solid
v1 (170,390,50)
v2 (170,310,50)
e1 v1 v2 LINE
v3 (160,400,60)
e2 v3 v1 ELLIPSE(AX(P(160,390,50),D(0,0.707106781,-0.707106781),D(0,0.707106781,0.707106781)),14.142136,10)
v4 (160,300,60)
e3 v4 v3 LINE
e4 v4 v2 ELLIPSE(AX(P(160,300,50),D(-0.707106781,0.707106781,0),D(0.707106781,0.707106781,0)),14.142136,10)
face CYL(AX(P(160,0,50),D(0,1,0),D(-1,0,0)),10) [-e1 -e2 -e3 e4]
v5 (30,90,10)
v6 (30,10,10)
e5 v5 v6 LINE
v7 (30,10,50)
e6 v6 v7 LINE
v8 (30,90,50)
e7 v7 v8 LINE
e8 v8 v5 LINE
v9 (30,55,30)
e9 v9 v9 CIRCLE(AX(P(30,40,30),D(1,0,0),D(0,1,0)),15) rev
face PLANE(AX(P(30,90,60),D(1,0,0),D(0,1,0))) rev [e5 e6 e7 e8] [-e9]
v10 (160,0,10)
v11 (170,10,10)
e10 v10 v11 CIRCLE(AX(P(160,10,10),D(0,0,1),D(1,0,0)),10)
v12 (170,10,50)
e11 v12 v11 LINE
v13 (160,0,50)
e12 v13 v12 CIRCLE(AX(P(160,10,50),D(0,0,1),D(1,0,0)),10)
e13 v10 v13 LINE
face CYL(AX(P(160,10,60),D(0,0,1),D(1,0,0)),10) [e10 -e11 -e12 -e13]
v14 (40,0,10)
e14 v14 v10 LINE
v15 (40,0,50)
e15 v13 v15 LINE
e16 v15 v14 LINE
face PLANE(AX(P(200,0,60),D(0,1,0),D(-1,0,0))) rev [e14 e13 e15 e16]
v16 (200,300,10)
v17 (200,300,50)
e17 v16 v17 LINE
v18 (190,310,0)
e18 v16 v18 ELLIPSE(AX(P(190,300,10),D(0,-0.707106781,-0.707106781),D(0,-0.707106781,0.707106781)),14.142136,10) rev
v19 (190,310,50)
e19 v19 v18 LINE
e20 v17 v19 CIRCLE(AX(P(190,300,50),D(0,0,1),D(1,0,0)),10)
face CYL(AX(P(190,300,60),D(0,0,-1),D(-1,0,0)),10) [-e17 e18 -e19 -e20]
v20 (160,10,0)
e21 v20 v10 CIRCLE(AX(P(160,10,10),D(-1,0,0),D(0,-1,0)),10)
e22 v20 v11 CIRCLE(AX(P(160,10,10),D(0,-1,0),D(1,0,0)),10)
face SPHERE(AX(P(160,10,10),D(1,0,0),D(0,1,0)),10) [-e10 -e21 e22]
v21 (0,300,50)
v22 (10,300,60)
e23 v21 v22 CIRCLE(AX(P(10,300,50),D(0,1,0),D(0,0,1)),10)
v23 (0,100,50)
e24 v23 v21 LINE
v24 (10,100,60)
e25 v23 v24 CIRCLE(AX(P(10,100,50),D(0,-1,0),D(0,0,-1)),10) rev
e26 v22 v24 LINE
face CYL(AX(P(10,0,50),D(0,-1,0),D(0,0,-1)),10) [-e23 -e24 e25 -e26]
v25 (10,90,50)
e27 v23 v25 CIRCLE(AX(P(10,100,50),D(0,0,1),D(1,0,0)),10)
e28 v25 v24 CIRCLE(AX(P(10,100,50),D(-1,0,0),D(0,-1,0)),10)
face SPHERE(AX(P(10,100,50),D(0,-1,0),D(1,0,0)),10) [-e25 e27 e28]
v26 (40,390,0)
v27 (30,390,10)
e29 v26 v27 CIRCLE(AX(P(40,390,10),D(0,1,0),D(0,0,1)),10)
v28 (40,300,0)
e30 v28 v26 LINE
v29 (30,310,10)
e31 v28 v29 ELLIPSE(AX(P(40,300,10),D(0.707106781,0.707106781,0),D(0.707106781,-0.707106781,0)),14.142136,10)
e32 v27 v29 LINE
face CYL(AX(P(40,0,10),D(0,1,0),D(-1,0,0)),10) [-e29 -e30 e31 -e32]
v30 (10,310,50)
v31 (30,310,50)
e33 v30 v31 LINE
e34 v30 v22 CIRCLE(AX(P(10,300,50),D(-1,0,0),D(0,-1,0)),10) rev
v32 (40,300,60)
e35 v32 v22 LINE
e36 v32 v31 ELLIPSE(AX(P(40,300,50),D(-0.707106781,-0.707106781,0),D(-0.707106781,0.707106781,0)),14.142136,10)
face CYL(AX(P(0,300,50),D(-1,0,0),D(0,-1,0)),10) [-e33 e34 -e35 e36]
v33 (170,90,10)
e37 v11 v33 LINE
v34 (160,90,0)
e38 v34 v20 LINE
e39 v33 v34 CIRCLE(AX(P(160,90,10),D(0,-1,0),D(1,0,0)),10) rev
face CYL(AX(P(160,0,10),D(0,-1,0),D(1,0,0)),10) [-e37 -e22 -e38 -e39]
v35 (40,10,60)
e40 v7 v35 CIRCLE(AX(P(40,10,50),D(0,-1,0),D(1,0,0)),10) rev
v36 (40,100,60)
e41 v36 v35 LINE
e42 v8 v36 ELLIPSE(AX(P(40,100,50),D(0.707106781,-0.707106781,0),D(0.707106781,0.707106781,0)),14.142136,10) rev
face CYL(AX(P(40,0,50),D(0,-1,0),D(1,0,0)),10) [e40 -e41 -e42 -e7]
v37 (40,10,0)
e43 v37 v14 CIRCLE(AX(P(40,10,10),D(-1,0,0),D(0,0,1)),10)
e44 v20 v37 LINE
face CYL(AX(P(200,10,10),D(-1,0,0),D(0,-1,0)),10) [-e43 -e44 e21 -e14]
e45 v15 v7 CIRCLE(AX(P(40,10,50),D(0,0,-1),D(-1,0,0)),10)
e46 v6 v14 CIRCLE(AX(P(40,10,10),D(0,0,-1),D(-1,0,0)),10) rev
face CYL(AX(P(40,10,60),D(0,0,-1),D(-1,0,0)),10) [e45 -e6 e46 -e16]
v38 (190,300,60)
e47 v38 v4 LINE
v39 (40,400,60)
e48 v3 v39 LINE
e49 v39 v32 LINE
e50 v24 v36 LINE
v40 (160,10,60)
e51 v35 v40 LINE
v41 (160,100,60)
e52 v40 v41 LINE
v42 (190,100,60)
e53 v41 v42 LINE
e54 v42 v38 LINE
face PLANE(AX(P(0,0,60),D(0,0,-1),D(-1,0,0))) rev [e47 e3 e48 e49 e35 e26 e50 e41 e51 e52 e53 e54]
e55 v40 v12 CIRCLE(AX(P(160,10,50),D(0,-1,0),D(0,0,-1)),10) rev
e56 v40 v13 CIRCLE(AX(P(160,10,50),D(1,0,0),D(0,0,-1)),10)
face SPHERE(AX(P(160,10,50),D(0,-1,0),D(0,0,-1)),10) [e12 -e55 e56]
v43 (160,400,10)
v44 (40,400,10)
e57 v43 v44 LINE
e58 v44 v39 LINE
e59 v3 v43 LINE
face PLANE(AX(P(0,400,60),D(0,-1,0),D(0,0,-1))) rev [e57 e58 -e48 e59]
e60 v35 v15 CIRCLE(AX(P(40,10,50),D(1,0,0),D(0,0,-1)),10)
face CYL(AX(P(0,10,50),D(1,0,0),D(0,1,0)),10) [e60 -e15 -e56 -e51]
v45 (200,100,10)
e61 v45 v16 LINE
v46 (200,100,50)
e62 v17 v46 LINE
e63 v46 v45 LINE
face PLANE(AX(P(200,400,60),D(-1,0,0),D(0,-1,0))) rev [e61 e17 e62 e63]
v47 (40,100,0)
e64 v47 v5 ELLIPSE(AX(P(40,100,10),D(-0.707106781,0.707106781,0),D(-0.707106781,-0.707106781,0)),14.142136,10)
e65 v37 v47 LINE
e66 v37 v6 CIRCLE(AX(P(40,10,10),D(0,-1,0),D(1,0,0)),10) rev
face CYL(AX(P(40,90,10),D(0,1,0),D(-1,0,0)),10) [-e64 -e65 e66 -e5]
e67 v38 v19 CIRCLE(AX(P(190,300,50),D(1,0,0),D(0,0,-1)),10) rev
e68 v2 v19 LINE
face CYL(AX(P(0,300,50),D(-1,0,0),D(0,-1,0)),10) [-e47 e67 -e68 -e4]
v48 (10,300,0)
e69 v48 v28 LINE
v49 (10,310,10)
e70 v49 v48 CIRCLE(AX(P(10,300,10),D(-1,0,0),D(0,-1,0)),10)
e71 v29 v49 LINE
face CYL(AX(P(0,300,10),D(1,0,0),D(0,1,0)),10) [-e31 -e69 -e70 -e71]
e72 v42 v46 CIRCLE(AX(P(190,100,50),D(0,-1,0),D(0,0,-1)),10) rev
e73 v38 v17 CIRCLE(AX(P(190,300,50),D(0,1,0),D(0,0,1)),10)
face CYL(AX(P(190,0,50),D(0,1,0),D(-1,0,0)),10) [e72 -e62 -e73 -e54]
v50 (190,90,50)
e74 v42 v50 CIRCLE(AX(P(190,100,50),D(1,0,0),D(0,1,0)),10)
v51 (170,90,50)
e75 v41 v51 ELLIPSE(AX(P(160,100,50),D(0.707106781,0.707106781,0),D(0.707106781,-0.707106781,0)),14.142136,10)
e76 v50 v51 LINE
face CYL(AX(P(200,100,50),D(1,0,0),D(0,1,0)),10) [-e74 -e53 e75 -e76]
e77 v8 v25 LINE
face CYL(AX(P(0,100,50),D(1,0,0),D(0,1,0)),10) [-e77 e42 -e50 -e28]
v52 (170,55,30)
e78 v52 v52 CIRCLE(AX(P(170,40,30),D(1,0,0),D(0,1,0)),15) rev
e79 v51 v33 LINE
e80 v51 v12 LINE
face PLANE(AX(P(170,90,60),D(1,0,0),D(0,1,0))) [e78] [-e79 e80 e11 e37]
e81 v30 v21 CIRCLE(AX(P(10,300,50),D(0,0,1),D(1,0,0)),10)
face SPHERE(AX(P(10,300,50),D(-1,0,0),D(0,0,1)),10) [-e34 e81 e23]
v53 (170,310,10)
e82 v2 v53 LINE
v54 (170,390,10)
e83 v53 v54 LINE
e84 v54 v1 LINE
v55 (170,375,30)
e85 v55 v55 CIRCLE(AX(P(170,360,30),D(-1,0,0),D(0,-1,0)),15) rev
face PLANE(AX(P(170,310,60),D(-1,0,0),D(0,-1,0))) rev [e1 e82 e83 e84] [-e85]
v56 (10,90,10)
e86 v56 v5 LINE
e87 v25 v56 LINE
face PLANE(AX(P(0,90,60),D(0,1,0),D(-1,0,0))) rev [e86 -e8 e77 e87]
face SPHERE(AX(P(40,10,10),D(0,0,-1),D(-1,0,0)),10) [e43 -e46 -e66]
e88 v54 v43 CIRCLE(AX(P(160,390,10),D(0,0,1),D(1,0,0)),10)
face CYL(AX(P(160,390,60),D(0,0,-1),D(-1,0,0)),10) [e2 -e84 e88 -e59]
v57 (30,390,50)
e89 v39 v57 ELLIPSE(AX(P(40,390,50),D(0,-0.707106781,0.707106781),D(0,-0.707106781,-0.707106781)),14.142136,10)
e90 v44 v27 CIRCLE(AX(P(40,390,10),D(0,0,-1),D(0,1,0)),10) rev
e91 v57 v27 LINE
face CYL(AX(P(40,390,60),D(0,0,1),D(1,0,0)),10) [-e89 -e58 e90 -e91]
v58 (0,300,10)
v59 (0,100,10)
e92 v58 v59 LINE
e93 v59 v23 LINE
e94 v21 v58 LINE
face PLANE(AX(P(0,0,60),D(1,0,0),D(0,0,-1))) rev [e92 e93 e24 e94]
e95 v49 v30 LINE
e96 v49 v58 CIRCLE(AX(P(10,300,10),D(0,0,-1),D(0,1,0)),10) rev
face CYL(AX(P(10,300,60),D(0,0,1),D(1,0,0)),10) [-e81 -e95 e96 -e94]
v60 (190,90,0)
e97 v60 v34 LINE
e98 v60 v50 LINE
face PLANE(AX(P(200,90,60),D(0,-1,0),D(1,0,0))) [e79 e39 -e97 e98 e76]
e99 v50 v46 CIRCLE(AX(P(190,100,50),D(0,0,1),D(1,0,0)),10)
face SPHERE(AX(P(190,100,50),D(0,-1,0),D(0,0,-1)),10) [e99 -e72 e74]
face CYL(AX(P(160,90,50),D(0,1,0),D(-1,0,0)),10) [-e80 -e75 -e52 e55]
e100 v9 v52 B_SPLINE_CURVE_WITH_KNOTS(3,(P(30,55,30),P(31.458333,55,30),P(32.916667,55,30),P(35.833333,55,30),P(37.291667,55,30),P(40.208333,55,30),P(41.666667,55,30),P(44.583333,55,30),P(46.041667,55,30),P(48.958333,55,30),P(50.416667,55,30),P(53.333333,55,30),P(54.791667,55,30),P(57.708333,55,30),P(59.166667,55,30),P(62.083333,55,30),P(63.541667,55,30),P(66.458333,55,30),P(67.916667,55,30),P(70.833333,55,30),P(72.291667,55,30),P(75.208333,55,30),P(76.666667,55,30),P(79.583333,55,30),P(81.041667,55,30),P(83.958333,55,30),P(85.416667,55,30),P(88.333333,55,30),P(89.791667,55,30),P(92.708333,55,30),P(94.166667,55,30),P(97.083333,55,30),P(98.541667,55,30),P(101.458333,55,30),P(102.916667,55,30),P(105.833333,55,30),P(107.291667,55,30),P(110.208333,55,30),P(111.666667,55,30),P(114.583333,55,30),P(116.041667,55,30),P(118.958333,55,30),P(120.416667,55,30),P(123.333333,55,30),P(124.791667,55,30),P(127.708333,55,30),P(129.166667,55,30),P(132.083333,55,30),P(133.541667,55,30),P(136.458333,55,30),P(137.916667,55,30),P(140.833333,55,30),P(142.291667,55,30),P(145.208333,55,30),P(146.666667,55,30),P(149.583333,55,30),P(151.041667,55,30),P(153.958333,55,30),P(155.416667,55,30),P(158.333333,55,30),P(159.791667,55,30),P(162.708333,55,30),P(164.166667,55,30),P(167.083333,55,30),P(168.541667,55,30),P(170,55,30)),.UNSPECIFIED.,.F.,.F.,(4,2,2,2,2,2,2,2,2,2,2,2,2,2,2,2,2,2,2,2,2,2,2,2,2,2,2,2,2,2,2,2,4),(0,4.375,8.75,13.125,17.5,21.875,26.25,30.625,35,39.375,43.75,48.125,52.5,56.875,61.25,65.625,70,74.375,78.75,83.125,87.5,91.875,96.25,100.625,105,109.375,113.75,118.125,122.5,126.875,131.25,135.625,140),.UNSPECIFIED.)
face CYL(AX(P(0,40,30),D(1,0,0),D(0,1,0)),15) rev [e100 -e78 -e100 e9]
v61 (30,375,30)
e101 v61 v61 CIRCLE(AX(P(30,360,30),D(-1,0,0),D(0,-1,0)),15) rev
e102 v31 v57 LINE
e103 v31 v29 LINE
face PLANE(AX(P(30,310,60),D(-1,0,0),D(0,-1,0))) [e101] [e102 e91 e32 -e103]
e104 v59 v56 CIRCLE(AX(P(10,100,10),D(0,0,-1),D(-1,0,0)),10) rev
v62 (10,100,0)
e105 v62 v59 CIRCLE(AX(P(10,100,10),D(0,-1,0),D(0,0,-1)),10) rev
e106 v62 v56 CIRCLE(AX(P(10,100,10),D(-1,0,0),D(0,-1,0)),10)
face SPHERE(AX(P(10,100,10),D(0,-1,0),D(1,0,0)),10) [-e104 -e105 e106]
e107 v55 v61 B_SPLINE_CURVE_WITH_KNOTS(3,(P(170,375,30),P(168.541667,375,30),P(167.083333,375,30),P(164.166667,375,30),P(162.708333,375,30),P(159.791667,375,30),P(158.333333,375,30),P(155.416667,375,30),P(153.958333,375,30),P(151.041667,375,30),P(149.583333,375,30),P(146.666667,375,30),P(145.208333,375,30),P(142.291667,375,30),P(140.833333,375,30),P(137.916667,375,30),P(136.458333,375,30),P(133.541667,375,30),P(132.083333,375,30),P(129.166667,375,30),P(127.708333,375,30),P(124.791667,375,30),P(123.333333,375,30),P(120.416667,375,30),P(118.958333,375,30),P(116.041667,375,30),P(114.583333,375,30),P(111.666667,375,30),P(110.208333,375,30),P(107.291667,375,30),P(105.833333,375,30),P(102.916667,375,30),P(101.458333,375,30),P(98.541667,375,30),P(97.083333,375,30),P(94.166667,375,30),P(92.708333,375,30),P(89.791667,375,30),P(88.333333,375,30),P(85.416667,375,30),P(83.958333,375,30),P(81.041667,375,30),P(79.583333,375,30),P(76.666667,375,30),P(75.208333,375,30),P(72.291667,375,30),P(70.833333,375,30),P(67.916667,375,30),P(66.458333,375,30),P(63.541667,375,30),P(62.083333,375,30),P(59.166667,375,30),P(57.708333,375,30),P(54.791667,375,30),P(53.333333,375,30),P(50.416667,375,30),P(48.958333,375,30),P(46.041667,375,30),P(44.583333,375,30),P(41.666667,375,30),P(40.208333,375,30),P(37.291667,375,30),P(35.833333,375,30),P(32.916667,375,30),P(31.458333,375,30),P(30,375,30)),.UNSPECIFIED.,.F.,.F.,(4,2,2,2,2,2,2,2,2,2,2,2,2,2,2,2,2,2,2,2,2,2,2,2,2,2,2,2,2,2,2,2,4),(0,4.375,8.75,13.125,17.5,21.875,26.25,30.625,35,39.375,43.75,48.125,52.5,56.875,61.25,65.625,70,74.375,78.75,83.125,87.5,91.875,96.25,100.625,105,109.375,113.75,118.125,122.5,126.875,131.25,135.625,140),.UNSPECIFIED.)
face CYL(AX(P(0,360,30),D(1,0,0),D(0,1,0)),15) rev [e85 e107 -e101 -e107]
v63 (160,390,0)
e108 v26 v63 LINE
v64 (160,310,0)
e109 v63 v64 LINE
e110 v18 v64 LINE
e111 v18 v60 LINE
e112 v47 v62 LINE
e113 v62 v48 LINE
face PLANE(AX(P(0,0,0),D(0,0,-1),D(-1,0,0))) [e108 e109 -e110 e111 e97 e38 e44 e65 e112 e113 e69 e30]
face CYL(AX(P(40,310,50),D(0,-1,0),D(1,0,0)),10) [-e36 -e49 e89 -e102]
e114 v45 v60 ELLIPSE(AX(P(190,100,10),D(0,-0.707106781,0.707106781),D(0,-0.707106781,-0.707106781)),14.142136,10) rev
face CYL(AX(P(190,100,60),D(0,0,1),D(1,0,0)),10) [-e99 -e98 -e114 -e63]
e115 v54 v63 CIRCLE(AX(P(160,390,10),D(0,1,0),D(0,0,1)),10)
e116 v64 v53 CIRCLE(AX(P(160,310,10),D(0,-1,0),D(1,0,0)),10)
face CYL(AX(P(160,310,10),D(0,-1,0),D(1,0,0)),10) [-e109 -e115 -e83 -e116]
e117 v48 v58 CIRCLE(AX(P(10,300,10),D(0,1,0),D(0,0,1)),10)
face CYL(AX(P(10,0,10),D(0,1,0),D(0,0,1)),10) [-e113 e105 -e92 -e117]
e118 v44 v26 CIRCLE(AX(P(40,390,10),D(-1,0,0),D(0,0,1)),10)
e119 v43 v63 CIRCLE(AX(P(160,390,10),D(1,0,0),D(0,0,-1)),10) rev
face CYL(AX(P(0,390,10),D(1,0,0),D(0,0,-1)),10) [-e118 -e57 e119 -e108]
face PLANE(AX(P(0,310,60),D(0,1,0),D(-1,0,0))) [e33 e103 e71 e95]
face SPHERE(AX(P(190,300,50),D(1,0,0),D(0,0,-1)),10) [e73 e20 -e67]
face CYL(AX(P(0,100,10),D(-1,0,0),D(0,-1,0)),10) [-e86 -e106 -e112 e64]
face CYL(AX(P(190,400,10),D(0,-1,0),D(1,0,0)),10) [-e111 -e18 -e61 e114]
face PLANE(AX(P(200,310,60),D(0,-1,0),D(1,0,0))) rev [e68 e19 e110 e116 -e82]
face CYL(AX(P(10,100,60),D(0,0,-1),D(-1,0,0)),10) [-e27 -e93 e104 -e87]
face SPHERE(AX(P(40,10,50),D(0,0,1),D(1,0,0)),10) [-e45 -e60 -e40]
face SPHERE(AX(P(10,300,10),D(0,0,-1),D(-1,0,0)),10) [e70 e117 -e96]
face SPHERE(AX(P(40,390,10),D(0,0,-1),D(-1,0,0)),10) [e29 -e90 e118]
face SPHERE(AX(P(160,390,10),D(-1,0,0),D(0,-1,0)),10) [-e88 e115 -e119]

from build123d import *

# Parameters (mm, degrees)
SKETCH1_W                                  = 200
SKETCH1_H                                  = 400
BOSS_EXTRUDE1_DEPTH                        = 60
SKETCH2_R                                  = 15
CUT_EXTRUDE1_DEPTH                         = 452.220566907
SKETCH3_W                                  = 30
SKETCH3_H                                  = 90
CUT_EXTRUDE2_DEPTH                         = 452.220566907
MIRROR1_AT_THE_SECOND_PLANE_COPY_1_SKETC_W = 30
MIRROR1_AT_THE_SECOND_PLANE_COPY_1_SKETC_H = 90
MIRROR1_AT_THE_SECOND_PLANE_COPY_1_DEPTH   = 452.220566907
FILLET1_R                                  = 10
FILLET2_R                                  = 10


with BuildPart() as part:
    # Sketch1 → Boss-Extrude1 (new body)
    with BuildSketch(Plane.XY):
        with Locations((100, 200)):
            Rectangle(SKETCH1_W, SKETCH1_H)
    extrude(amount=BOSS_EXTRUDE1_DEPTH)

    # Sketch2 → Cut-Extrude1 (cut, through all)
    with BuildSketch(Plane(origin=(200, 0, 0), x_dir=(0, 0, -1), z_dir=(1, 0, 0))):
        with Locations(Location((-30, 40, 0), (0, 0, 90))):
            Circle(SKETCH2_R)
        with Locations(Location((-30, 360, 0), (0, 0, 90))):
            Circle(SKETCH2_R)
    extrude(amount=-CUT_EXTRUDE1_DEPTH, mode=Mode.SUBTRACT)

    # Sketch3 → Cut-Extrude2 (cut, through all)
    with BuildSketch(Plane(origin=(0, 0, 0), x_dir=(-1, 0, 0), z_dir=(0, 0, -1))):
        with Locations((-15, 45)):
            Rectangle(SKETCH3_W, SKETCH3_H)
    cut_extrude2 = extrude(amount=-CUT_EXTRUDE2_DEPTH, mode=Mode.SUBTRACT)

    # Mirror1: Cut-Extrude2 across plane
    add(cut_extrude2.mirror(Plane(origin=(100, 0, 0), x_dir=(0, 0, 1), z_dir=(1, 0, 0))), mode=Mode.SUBTRACT)

    # Mirror1 at the second plane: Cut-Extrude2 across plane
    add(cut_extrude2.mirror(Plane.ZX.offset(200)), mode=Mode.SUBTRACT)

    # Mirror1 at the second plane copy 1 sketc → Mirror1 at the second plane copy 1 (cut, through all)
    with BuildSketch(Plane(origin=(200, 400, 0), x_dir=(1, 0, 0), z_dir=(0, 0, -1))):
        with Locations((-15, 45)):
            Rectangle(MIRROR1_AT_THE_SECOND_PLANE_COPY_1_SKETC_W, MIRROR1_AT_THE_SECOND_PLANE_COPY_1_SKETC_H)
    extrude(amount=-MIRROR1_AT_THE_SECOND_PLANE_COPY_1_DEPTH, mode=Mode.SUBTRACT)

    # Fillet1
    fillet1_edges = [part.edges().sort_by_distance(p)[0] for p in [
        (100, 0, 0),
        (0, 90, 30),
        (30, 45, 60),
        (30, 0, 30),
        (15, 90, 60),
        (15, 90, 0),
        (30, 45, 0),
        (0, 200, 0),
        (0, 200, 60),
        (30, 355, 0),
        (15, 310, 0),
        (0, 310, 30),
        (30, 400, 30),
        (15, 310, 60),
        (30, 355, 60),
        (100, 400, 0),
    ]]
    fillet(fillet1_edges, radius=FILLET1_R)

    # Fillet2
    # the kernel refuses this fillet: 10 mm, written as the material it takes off along each edge
    with BuildSketch(Plane(origin=(40, 10, 50), x_dir=(0, -1, 0), z_dir=(0, 0, 1))) as fillet2_piece_1_section:
        Polygon((0, 0), (FILLET2_R, 0), (FILLET2_R, -FILLET2_R), (0, -FILLET2_R), align=None)
    fillet2_piece_1 = extrude(amount=FILLET2_R, mode=Mode.PRIVATE)
    fillet2_piece_1 = fillet2_piece_1 - Plane(origin=(40, 10, 50), x_dir=(0.7071067811865476, 0.7071067811865475, 0), z_dir=(0, 0, 1)) * Sphere(FILLET2_R, mode=Mode.PRIVATE)
    add(fillet2_piece_1, mode=Mode.SUBTRACT)
    with BuildSketch(Plane(origin=(190, 300, 50), x_dir=(1, 0, 0), z_dir=(0, 0, 1))) as fillet2_piece_2_section:
        Polygon((0, 0), (FILLET2_R, 0), (FILLET2_R, FILLET2_R), (0, FILLET2_R), align=None)
    fillet2_piece_2 = extrude(amount=FILLET2_R, mode=Mode.PRIVATE)
    fillet2_piece_2 = fillet2_piece_2 - Plane(origin=(190, 300, 50), x_dir=(-0.7071067811865471, -0.707106781186548, 0), z_dir=(0, 0, 1)) * Sphere(FILLET2_R, mode=Mode.PRIVATE)
    add(fillet2_piece_2, mode=Mode.SUBTRACT)
    with BuildSketch(Plane(origin=(190, 100, 50), x_dir=(0, -1, 0), z_dir=(0, 0, 1))) as fillet2_piece_3_section:
        Polygon((0, 0), (FILLET2_R, 0), (FILLET2_R, FILLET2_R), (0, FILLET2_R), align=None)
    fillet2_piece_3 = extrude(amount=FILLET2_R, mode=Mode.PRIVATE)
    fillet2_piece_3 = fillet2_piece_3 - Plane(origin=(190, 100, 50), x_dir=(-0.7071067811865472, 0.7071067811865478, 0), z_dir=(0, 0, 1)) * Sphere(FILLET2_R, mode=Mode.PRIVATE)
    add(fillet2_piece_3, mode=Mode.SUBTRACT)
    with BuildSketch(Plane(origin=(160, 10, 50), x_dir=(0, -1, 0), z_dir=(1, 0, 0))) as fillet2_piece_4_section:
        Polygon((0, 0), (FILLET2_R, 0), (FILLET2_R, -FILLET2_R), (0, -FILLET2_R), align=None)
    fillet2_piece_4 = extrude(amount=FILLET2_R, mode=Mode.PRIVATE)
    fillet2_piece_4 = fillet2_piece_4 - Plane(origin=(160, 10, 50), x_dir=(0, 0.7071067811865475, -0.7071067811865475), z_dir=(1, 0, 0)) * Sphere(FILLET2_R, mode=Mode.PRIVATE)
    add(fillet2_piece_4, mode=Mode.SUBTRACT)
    with BuildSketch(Plane(origin=(170, 10, 10), x_dir=(0, 0, -1), z_dir=(0, 1, 0))) as fillet2_piece_5:
        with BuildLine():
            CenterArc((10 - FILLET2_R, FILLET2_R), FILLET2_R, 270, 90)
            Line((10, FILLET2_R), (10, 0))
            Line((10, 0), (10 - FILLET2_R, 0))
        make_face()
    revolve(axis=Axis((170, 10, 10), (-1, 0, 0)), revolution_arc=90, mode=Mode.SUBTRACT)
    with BuildSketch(Plane(origin=(170, 390, 10), x_dir=(0, 0, -1), z_dir=(0, -1, 0))) as fillet2_piece_6:
        with BuildLine():
            CenterArc((10 - FILLET2_R, -FILLET2_R), FILLET2_R, 0, 90)
            Line((10, -FILLET2_R), (10, 0))
            Line((10, 0), (10 - FILLET2_R, 0))
        make_face()
    revolve(axis=Axis((170, 390, 10), (1, 0, 0)), revolution_arc=90, mode=Mode.SUBTRACT)
    with BuildSketch(Plane(origin=(200, 335, 0), x_dir=(-1, 0, 0), z_dir=(0, -1, 0))) as fillet2_piece_7:
        with BuildLine():
            CenterArc((FILLET2_R, -FILLET2_R), FILLET2_R, 90, 90)
            Line((0, -FILLET2_R), (0, 0))
            Line((0, 0), (FILLET2_R, 0))
        make_face()
    extrude(amount=270, mode=Mode.SUBTRACT)
    with BuildSketch(Plane(origin=(200, 300, 60), x_dir=(-1, 0, 0), z_dir=(0, -1, 0))) as fillet2_piece_8:
        with BuildLine():
            CenterArc((FILLET2_R, FILLET2_R), FILLET2_R, 180, 90)
            Line((0, FILLET2_R), (0, 0))
            Line((0, 0), (FILLET2_R, 0))
        make_face()
    extrude(amount=200, mode=Mode.SUBTRACT)
    with BuildSketch(Plane(origin=(170, 90, 0), x_dir=(-1, 0, 0), z_dir=(0, -1, 0))) as fillet2_piece_9:
        with BuildLine():
            CenterArc((FILLET2_R, -FILLET2_R), FILLET2_R, 90, 90)
            Line((0, -FILLET2_R), (0, 0))
            Line((0, 0), (FILLET2_R, 0))
        make_face()
    extrude(amount=80, mode=Mode.SUBTRACT)
    with BuildSketch(Plane(origin=(200, 90, -25), x_dir=(-1, 0, 0), z_dir=(0, 0, 1)), Plane(origin=(200, 310, -25), x_dir=(0, -1, 0), z_dir=(0, 0, 1)), Plane(origin=(170, 400, 10), x_dir=(0, -1, 0), z_dir=(0, 0, 1))) as fillet2_piece_10:
        with BuildLine():
            CenterArc((FILLET2_R, -FILLET2_R), FILLET2_R, 90, 90)
            Line((0, -FILLET2_R), (0, 0))
            Line((0, 0), (FILLET2_R, 0))
        make_face()
    extrude(amount=75, mode=Mode.SUBTRACT)
    with BuildSketch(Plane(origin=(170, 0, 10), x_dir=(0, 1, 0), z_dir=(0, 0, 1))) as fillet2_piece_11:
        with BuildLine():
            CenterArc((FILLET2_R, FILLET2_R), FILLET2_R, 180, 90)
            Line((0, FILLET2_R), (0, 0))
            Line((0, 0), (FILLET2_R, 0))
        make_face()
    extrude(amount=40, mode=Mode.SUBTRACT)
    with BuildSketch(Plane(origin=(190, 90, 60), x_dir=(0, 1, 0), z_dir=(-1, 0, 0))) as fillet2_piece_12:
        with BuildLine():
            CenterArc((FILLET2_R, FILLET2_R), FILLET2_R, 180, 90)
            Line((0, FILLET2_R), (0, 0))
            Line((0, 0), (FILLET2_R, 0))
        make_face()
    extrude(amount=20, mode=Mode.SUBTRACT)
    with BuildSketch(Plane(origin=(170, 90, 60), x_dir=(-1, 0, 0), z_dir=(0, -1, 0)), Plane(origin=(170, 310, 0), x_dir=(-1, 0, 0), z_dir=(0, 1, 0))) as fillet2_piece_13:
        with BuildLine():
            CenterArc((FILLET2_R, FILLET2_R), FILLET2_R, 180, 90)
            Line((0, FILLET2_R), (0, 0))
            Line((0, 0), (FILLET2_R, 0))
        make_face()
    extrude(amount=80, mode=Mode.SUBTRACT)
    with BuildSketch(Plane(origin=(170, 310, 60), x_dir=(-1, 0, 0), z_dir=(0, 1, 0))) as fillet2_piece_14:
        with BuildLine():
            CenterArc((FILLET2_R, -FILLET2_R), FILLET2_R, 90, 90)
            Line((0, -FILLET2_R), (0, 0))
            Line((0, 0), (FILLET2_R, 0))
        make_face()
    extrude(amount=115, mode=Mode.SUBTRACT)
    with BuildSketch(Plane(origin=(190, 310, 60), x_dir=(0, -1, 0), z_dir=(-1, 0, 0))) as fillet2_piece_15:
        with BuildLine():
            CenterArc((FILLET2_R, -FILLET2_R), FILLET2_R, 90, 90)
            Line((0, -FILLET2_R), (0, 0))
            Line((0, 0), (FILLET2_R, 0))
        make_face()
    extrude(amount=20, mode=Mode.SUBTRACT)
    with BuildSketch(Plane(origin=(160, 0, 60), x_dir=(0, 1, 0), z_dir=(-1, 0, 0))) as fillet2_piece_16:
        with BuildLine():
            CenterArc((FILLET2_R, FILLET2_R), FILLET2_R, 180, 90)
            Line((0, FILLET2_R), (0, 0))
            Line((0, 0), (FILLET2_R, 0))
        make_face()
    extrude(amount=120, mode=Mode.SUBTRACT)
    with BuildSketch(Plane(origin=(170, 115, 60), x_dir=(-1, 0, 0), z_dir=(0, -1, 0))) as fillet2_piece_17a_section:
        with BuildLine():
            CenterArc((FILLET2_R, FILLET2_R), FILLET2_R, 180, 90)
            Line((0, FILLET2_R), (0, 0))
            Line((0, 0), (FILLET2_R, 0))
        make_face()
    fillet2_piece_17a = extrude(amount=105, mode=Mode.PRIVATE)
    fillet2_piece_17a = split(fillet2_piece_17a, bisect_by=Plane(origin=(167.736048857, 90, 57.736048857), z_dir=(0, 1, 0)), keep=Keep.TOP, mode=Mode.PRIVATE)
    with BuildSketch(Plane(origin=(190, 90, 60), x_dir=(0, 1, 0), z_dir=(-1, 0, 0))) as fillet2_piece_17b_section:
        with BuildLine():
            CenterArc((FILLET2_R, FILLET2_R), FILLET2_R, 180, 90)
            Line((0, FILLET2_R), (0, 0))
            Line((0, 0), (FILLET2_R, 0))
        make_face()
    fillet2_piece_17b = extrude(amount=45, mode=Mode.PRIVATE)
    fillet2_piece_17b = split(fillet2_piece_17b, bisect_by=Plane(origin=(170, 92.263951143, 57.736048857), z_dir=(-1, 0, 0)), keep=Keep.TOP, mode=Mode.PRIVATE)
    fillet2_piece_17 = fillet2_piece_17a & fillet2_piece_17b
    add(fillet2_piece_17, mode=Mode.SUBTRACT)
    with BuildSketch(Plane(origin=(190, 310, 60), x_dir=(0, -1, 0), z_dir=(-1, 0, 0))) as fillet2_piece_18a_section:
        with BuildLine():
            CenterArc((FILLET2_R, -FILLET2_R), FILLET2_R, 90, 90)
            Line((0, -FILLET2_R), (0, 0))
            Line((0, 0), (FILLET2_R, 0))
        make_face()
    fillet2_piece_18a = extrude(amount=45, mode=Mode.PRIVATE)
    fillet2_piece_18a = split(fillet2_piece_18a, bisect_by=Plane(origin=(170, 307.736048857, 57.736048857), z_dir=(-1, 0, 0)), keep=Keep.TOP, mode=Mode.PRIVATE)
    with BuildSketch(Plane(origin=(170, 285, 60), x_dir=(-1, 0, 0), z_dir=(0, 1, 0))) as fillet2_piece_18b_section:
        with BuildLine():
            CenterArc((FILLET2_R, -FILLET2_R), FILLET2_R, 90, 90)
            Line((0, -FILLET2_R), (0, 0))
            Line((0, 0), (FILLET2_R, 0))
        make_face()
    fillet2_piece_18b = extrude(amount=140, mode=Mode.PRIVATE)
    fillet2_piece_18b = split(fillet2_piece_18b, bisect_by=Plane(origin=(167.736048857, 310, 57.736048857), z_dir=(0, -1, 0)), keep=Keep.TOP, mode=Mode.PRIVATE)
    fillet2_piece_18 = fillet2_piece_18a & fillet2_piece_18b
    add(fillet2_piece_18, mode=Mode.SUBTRACT)


solid = part.part
